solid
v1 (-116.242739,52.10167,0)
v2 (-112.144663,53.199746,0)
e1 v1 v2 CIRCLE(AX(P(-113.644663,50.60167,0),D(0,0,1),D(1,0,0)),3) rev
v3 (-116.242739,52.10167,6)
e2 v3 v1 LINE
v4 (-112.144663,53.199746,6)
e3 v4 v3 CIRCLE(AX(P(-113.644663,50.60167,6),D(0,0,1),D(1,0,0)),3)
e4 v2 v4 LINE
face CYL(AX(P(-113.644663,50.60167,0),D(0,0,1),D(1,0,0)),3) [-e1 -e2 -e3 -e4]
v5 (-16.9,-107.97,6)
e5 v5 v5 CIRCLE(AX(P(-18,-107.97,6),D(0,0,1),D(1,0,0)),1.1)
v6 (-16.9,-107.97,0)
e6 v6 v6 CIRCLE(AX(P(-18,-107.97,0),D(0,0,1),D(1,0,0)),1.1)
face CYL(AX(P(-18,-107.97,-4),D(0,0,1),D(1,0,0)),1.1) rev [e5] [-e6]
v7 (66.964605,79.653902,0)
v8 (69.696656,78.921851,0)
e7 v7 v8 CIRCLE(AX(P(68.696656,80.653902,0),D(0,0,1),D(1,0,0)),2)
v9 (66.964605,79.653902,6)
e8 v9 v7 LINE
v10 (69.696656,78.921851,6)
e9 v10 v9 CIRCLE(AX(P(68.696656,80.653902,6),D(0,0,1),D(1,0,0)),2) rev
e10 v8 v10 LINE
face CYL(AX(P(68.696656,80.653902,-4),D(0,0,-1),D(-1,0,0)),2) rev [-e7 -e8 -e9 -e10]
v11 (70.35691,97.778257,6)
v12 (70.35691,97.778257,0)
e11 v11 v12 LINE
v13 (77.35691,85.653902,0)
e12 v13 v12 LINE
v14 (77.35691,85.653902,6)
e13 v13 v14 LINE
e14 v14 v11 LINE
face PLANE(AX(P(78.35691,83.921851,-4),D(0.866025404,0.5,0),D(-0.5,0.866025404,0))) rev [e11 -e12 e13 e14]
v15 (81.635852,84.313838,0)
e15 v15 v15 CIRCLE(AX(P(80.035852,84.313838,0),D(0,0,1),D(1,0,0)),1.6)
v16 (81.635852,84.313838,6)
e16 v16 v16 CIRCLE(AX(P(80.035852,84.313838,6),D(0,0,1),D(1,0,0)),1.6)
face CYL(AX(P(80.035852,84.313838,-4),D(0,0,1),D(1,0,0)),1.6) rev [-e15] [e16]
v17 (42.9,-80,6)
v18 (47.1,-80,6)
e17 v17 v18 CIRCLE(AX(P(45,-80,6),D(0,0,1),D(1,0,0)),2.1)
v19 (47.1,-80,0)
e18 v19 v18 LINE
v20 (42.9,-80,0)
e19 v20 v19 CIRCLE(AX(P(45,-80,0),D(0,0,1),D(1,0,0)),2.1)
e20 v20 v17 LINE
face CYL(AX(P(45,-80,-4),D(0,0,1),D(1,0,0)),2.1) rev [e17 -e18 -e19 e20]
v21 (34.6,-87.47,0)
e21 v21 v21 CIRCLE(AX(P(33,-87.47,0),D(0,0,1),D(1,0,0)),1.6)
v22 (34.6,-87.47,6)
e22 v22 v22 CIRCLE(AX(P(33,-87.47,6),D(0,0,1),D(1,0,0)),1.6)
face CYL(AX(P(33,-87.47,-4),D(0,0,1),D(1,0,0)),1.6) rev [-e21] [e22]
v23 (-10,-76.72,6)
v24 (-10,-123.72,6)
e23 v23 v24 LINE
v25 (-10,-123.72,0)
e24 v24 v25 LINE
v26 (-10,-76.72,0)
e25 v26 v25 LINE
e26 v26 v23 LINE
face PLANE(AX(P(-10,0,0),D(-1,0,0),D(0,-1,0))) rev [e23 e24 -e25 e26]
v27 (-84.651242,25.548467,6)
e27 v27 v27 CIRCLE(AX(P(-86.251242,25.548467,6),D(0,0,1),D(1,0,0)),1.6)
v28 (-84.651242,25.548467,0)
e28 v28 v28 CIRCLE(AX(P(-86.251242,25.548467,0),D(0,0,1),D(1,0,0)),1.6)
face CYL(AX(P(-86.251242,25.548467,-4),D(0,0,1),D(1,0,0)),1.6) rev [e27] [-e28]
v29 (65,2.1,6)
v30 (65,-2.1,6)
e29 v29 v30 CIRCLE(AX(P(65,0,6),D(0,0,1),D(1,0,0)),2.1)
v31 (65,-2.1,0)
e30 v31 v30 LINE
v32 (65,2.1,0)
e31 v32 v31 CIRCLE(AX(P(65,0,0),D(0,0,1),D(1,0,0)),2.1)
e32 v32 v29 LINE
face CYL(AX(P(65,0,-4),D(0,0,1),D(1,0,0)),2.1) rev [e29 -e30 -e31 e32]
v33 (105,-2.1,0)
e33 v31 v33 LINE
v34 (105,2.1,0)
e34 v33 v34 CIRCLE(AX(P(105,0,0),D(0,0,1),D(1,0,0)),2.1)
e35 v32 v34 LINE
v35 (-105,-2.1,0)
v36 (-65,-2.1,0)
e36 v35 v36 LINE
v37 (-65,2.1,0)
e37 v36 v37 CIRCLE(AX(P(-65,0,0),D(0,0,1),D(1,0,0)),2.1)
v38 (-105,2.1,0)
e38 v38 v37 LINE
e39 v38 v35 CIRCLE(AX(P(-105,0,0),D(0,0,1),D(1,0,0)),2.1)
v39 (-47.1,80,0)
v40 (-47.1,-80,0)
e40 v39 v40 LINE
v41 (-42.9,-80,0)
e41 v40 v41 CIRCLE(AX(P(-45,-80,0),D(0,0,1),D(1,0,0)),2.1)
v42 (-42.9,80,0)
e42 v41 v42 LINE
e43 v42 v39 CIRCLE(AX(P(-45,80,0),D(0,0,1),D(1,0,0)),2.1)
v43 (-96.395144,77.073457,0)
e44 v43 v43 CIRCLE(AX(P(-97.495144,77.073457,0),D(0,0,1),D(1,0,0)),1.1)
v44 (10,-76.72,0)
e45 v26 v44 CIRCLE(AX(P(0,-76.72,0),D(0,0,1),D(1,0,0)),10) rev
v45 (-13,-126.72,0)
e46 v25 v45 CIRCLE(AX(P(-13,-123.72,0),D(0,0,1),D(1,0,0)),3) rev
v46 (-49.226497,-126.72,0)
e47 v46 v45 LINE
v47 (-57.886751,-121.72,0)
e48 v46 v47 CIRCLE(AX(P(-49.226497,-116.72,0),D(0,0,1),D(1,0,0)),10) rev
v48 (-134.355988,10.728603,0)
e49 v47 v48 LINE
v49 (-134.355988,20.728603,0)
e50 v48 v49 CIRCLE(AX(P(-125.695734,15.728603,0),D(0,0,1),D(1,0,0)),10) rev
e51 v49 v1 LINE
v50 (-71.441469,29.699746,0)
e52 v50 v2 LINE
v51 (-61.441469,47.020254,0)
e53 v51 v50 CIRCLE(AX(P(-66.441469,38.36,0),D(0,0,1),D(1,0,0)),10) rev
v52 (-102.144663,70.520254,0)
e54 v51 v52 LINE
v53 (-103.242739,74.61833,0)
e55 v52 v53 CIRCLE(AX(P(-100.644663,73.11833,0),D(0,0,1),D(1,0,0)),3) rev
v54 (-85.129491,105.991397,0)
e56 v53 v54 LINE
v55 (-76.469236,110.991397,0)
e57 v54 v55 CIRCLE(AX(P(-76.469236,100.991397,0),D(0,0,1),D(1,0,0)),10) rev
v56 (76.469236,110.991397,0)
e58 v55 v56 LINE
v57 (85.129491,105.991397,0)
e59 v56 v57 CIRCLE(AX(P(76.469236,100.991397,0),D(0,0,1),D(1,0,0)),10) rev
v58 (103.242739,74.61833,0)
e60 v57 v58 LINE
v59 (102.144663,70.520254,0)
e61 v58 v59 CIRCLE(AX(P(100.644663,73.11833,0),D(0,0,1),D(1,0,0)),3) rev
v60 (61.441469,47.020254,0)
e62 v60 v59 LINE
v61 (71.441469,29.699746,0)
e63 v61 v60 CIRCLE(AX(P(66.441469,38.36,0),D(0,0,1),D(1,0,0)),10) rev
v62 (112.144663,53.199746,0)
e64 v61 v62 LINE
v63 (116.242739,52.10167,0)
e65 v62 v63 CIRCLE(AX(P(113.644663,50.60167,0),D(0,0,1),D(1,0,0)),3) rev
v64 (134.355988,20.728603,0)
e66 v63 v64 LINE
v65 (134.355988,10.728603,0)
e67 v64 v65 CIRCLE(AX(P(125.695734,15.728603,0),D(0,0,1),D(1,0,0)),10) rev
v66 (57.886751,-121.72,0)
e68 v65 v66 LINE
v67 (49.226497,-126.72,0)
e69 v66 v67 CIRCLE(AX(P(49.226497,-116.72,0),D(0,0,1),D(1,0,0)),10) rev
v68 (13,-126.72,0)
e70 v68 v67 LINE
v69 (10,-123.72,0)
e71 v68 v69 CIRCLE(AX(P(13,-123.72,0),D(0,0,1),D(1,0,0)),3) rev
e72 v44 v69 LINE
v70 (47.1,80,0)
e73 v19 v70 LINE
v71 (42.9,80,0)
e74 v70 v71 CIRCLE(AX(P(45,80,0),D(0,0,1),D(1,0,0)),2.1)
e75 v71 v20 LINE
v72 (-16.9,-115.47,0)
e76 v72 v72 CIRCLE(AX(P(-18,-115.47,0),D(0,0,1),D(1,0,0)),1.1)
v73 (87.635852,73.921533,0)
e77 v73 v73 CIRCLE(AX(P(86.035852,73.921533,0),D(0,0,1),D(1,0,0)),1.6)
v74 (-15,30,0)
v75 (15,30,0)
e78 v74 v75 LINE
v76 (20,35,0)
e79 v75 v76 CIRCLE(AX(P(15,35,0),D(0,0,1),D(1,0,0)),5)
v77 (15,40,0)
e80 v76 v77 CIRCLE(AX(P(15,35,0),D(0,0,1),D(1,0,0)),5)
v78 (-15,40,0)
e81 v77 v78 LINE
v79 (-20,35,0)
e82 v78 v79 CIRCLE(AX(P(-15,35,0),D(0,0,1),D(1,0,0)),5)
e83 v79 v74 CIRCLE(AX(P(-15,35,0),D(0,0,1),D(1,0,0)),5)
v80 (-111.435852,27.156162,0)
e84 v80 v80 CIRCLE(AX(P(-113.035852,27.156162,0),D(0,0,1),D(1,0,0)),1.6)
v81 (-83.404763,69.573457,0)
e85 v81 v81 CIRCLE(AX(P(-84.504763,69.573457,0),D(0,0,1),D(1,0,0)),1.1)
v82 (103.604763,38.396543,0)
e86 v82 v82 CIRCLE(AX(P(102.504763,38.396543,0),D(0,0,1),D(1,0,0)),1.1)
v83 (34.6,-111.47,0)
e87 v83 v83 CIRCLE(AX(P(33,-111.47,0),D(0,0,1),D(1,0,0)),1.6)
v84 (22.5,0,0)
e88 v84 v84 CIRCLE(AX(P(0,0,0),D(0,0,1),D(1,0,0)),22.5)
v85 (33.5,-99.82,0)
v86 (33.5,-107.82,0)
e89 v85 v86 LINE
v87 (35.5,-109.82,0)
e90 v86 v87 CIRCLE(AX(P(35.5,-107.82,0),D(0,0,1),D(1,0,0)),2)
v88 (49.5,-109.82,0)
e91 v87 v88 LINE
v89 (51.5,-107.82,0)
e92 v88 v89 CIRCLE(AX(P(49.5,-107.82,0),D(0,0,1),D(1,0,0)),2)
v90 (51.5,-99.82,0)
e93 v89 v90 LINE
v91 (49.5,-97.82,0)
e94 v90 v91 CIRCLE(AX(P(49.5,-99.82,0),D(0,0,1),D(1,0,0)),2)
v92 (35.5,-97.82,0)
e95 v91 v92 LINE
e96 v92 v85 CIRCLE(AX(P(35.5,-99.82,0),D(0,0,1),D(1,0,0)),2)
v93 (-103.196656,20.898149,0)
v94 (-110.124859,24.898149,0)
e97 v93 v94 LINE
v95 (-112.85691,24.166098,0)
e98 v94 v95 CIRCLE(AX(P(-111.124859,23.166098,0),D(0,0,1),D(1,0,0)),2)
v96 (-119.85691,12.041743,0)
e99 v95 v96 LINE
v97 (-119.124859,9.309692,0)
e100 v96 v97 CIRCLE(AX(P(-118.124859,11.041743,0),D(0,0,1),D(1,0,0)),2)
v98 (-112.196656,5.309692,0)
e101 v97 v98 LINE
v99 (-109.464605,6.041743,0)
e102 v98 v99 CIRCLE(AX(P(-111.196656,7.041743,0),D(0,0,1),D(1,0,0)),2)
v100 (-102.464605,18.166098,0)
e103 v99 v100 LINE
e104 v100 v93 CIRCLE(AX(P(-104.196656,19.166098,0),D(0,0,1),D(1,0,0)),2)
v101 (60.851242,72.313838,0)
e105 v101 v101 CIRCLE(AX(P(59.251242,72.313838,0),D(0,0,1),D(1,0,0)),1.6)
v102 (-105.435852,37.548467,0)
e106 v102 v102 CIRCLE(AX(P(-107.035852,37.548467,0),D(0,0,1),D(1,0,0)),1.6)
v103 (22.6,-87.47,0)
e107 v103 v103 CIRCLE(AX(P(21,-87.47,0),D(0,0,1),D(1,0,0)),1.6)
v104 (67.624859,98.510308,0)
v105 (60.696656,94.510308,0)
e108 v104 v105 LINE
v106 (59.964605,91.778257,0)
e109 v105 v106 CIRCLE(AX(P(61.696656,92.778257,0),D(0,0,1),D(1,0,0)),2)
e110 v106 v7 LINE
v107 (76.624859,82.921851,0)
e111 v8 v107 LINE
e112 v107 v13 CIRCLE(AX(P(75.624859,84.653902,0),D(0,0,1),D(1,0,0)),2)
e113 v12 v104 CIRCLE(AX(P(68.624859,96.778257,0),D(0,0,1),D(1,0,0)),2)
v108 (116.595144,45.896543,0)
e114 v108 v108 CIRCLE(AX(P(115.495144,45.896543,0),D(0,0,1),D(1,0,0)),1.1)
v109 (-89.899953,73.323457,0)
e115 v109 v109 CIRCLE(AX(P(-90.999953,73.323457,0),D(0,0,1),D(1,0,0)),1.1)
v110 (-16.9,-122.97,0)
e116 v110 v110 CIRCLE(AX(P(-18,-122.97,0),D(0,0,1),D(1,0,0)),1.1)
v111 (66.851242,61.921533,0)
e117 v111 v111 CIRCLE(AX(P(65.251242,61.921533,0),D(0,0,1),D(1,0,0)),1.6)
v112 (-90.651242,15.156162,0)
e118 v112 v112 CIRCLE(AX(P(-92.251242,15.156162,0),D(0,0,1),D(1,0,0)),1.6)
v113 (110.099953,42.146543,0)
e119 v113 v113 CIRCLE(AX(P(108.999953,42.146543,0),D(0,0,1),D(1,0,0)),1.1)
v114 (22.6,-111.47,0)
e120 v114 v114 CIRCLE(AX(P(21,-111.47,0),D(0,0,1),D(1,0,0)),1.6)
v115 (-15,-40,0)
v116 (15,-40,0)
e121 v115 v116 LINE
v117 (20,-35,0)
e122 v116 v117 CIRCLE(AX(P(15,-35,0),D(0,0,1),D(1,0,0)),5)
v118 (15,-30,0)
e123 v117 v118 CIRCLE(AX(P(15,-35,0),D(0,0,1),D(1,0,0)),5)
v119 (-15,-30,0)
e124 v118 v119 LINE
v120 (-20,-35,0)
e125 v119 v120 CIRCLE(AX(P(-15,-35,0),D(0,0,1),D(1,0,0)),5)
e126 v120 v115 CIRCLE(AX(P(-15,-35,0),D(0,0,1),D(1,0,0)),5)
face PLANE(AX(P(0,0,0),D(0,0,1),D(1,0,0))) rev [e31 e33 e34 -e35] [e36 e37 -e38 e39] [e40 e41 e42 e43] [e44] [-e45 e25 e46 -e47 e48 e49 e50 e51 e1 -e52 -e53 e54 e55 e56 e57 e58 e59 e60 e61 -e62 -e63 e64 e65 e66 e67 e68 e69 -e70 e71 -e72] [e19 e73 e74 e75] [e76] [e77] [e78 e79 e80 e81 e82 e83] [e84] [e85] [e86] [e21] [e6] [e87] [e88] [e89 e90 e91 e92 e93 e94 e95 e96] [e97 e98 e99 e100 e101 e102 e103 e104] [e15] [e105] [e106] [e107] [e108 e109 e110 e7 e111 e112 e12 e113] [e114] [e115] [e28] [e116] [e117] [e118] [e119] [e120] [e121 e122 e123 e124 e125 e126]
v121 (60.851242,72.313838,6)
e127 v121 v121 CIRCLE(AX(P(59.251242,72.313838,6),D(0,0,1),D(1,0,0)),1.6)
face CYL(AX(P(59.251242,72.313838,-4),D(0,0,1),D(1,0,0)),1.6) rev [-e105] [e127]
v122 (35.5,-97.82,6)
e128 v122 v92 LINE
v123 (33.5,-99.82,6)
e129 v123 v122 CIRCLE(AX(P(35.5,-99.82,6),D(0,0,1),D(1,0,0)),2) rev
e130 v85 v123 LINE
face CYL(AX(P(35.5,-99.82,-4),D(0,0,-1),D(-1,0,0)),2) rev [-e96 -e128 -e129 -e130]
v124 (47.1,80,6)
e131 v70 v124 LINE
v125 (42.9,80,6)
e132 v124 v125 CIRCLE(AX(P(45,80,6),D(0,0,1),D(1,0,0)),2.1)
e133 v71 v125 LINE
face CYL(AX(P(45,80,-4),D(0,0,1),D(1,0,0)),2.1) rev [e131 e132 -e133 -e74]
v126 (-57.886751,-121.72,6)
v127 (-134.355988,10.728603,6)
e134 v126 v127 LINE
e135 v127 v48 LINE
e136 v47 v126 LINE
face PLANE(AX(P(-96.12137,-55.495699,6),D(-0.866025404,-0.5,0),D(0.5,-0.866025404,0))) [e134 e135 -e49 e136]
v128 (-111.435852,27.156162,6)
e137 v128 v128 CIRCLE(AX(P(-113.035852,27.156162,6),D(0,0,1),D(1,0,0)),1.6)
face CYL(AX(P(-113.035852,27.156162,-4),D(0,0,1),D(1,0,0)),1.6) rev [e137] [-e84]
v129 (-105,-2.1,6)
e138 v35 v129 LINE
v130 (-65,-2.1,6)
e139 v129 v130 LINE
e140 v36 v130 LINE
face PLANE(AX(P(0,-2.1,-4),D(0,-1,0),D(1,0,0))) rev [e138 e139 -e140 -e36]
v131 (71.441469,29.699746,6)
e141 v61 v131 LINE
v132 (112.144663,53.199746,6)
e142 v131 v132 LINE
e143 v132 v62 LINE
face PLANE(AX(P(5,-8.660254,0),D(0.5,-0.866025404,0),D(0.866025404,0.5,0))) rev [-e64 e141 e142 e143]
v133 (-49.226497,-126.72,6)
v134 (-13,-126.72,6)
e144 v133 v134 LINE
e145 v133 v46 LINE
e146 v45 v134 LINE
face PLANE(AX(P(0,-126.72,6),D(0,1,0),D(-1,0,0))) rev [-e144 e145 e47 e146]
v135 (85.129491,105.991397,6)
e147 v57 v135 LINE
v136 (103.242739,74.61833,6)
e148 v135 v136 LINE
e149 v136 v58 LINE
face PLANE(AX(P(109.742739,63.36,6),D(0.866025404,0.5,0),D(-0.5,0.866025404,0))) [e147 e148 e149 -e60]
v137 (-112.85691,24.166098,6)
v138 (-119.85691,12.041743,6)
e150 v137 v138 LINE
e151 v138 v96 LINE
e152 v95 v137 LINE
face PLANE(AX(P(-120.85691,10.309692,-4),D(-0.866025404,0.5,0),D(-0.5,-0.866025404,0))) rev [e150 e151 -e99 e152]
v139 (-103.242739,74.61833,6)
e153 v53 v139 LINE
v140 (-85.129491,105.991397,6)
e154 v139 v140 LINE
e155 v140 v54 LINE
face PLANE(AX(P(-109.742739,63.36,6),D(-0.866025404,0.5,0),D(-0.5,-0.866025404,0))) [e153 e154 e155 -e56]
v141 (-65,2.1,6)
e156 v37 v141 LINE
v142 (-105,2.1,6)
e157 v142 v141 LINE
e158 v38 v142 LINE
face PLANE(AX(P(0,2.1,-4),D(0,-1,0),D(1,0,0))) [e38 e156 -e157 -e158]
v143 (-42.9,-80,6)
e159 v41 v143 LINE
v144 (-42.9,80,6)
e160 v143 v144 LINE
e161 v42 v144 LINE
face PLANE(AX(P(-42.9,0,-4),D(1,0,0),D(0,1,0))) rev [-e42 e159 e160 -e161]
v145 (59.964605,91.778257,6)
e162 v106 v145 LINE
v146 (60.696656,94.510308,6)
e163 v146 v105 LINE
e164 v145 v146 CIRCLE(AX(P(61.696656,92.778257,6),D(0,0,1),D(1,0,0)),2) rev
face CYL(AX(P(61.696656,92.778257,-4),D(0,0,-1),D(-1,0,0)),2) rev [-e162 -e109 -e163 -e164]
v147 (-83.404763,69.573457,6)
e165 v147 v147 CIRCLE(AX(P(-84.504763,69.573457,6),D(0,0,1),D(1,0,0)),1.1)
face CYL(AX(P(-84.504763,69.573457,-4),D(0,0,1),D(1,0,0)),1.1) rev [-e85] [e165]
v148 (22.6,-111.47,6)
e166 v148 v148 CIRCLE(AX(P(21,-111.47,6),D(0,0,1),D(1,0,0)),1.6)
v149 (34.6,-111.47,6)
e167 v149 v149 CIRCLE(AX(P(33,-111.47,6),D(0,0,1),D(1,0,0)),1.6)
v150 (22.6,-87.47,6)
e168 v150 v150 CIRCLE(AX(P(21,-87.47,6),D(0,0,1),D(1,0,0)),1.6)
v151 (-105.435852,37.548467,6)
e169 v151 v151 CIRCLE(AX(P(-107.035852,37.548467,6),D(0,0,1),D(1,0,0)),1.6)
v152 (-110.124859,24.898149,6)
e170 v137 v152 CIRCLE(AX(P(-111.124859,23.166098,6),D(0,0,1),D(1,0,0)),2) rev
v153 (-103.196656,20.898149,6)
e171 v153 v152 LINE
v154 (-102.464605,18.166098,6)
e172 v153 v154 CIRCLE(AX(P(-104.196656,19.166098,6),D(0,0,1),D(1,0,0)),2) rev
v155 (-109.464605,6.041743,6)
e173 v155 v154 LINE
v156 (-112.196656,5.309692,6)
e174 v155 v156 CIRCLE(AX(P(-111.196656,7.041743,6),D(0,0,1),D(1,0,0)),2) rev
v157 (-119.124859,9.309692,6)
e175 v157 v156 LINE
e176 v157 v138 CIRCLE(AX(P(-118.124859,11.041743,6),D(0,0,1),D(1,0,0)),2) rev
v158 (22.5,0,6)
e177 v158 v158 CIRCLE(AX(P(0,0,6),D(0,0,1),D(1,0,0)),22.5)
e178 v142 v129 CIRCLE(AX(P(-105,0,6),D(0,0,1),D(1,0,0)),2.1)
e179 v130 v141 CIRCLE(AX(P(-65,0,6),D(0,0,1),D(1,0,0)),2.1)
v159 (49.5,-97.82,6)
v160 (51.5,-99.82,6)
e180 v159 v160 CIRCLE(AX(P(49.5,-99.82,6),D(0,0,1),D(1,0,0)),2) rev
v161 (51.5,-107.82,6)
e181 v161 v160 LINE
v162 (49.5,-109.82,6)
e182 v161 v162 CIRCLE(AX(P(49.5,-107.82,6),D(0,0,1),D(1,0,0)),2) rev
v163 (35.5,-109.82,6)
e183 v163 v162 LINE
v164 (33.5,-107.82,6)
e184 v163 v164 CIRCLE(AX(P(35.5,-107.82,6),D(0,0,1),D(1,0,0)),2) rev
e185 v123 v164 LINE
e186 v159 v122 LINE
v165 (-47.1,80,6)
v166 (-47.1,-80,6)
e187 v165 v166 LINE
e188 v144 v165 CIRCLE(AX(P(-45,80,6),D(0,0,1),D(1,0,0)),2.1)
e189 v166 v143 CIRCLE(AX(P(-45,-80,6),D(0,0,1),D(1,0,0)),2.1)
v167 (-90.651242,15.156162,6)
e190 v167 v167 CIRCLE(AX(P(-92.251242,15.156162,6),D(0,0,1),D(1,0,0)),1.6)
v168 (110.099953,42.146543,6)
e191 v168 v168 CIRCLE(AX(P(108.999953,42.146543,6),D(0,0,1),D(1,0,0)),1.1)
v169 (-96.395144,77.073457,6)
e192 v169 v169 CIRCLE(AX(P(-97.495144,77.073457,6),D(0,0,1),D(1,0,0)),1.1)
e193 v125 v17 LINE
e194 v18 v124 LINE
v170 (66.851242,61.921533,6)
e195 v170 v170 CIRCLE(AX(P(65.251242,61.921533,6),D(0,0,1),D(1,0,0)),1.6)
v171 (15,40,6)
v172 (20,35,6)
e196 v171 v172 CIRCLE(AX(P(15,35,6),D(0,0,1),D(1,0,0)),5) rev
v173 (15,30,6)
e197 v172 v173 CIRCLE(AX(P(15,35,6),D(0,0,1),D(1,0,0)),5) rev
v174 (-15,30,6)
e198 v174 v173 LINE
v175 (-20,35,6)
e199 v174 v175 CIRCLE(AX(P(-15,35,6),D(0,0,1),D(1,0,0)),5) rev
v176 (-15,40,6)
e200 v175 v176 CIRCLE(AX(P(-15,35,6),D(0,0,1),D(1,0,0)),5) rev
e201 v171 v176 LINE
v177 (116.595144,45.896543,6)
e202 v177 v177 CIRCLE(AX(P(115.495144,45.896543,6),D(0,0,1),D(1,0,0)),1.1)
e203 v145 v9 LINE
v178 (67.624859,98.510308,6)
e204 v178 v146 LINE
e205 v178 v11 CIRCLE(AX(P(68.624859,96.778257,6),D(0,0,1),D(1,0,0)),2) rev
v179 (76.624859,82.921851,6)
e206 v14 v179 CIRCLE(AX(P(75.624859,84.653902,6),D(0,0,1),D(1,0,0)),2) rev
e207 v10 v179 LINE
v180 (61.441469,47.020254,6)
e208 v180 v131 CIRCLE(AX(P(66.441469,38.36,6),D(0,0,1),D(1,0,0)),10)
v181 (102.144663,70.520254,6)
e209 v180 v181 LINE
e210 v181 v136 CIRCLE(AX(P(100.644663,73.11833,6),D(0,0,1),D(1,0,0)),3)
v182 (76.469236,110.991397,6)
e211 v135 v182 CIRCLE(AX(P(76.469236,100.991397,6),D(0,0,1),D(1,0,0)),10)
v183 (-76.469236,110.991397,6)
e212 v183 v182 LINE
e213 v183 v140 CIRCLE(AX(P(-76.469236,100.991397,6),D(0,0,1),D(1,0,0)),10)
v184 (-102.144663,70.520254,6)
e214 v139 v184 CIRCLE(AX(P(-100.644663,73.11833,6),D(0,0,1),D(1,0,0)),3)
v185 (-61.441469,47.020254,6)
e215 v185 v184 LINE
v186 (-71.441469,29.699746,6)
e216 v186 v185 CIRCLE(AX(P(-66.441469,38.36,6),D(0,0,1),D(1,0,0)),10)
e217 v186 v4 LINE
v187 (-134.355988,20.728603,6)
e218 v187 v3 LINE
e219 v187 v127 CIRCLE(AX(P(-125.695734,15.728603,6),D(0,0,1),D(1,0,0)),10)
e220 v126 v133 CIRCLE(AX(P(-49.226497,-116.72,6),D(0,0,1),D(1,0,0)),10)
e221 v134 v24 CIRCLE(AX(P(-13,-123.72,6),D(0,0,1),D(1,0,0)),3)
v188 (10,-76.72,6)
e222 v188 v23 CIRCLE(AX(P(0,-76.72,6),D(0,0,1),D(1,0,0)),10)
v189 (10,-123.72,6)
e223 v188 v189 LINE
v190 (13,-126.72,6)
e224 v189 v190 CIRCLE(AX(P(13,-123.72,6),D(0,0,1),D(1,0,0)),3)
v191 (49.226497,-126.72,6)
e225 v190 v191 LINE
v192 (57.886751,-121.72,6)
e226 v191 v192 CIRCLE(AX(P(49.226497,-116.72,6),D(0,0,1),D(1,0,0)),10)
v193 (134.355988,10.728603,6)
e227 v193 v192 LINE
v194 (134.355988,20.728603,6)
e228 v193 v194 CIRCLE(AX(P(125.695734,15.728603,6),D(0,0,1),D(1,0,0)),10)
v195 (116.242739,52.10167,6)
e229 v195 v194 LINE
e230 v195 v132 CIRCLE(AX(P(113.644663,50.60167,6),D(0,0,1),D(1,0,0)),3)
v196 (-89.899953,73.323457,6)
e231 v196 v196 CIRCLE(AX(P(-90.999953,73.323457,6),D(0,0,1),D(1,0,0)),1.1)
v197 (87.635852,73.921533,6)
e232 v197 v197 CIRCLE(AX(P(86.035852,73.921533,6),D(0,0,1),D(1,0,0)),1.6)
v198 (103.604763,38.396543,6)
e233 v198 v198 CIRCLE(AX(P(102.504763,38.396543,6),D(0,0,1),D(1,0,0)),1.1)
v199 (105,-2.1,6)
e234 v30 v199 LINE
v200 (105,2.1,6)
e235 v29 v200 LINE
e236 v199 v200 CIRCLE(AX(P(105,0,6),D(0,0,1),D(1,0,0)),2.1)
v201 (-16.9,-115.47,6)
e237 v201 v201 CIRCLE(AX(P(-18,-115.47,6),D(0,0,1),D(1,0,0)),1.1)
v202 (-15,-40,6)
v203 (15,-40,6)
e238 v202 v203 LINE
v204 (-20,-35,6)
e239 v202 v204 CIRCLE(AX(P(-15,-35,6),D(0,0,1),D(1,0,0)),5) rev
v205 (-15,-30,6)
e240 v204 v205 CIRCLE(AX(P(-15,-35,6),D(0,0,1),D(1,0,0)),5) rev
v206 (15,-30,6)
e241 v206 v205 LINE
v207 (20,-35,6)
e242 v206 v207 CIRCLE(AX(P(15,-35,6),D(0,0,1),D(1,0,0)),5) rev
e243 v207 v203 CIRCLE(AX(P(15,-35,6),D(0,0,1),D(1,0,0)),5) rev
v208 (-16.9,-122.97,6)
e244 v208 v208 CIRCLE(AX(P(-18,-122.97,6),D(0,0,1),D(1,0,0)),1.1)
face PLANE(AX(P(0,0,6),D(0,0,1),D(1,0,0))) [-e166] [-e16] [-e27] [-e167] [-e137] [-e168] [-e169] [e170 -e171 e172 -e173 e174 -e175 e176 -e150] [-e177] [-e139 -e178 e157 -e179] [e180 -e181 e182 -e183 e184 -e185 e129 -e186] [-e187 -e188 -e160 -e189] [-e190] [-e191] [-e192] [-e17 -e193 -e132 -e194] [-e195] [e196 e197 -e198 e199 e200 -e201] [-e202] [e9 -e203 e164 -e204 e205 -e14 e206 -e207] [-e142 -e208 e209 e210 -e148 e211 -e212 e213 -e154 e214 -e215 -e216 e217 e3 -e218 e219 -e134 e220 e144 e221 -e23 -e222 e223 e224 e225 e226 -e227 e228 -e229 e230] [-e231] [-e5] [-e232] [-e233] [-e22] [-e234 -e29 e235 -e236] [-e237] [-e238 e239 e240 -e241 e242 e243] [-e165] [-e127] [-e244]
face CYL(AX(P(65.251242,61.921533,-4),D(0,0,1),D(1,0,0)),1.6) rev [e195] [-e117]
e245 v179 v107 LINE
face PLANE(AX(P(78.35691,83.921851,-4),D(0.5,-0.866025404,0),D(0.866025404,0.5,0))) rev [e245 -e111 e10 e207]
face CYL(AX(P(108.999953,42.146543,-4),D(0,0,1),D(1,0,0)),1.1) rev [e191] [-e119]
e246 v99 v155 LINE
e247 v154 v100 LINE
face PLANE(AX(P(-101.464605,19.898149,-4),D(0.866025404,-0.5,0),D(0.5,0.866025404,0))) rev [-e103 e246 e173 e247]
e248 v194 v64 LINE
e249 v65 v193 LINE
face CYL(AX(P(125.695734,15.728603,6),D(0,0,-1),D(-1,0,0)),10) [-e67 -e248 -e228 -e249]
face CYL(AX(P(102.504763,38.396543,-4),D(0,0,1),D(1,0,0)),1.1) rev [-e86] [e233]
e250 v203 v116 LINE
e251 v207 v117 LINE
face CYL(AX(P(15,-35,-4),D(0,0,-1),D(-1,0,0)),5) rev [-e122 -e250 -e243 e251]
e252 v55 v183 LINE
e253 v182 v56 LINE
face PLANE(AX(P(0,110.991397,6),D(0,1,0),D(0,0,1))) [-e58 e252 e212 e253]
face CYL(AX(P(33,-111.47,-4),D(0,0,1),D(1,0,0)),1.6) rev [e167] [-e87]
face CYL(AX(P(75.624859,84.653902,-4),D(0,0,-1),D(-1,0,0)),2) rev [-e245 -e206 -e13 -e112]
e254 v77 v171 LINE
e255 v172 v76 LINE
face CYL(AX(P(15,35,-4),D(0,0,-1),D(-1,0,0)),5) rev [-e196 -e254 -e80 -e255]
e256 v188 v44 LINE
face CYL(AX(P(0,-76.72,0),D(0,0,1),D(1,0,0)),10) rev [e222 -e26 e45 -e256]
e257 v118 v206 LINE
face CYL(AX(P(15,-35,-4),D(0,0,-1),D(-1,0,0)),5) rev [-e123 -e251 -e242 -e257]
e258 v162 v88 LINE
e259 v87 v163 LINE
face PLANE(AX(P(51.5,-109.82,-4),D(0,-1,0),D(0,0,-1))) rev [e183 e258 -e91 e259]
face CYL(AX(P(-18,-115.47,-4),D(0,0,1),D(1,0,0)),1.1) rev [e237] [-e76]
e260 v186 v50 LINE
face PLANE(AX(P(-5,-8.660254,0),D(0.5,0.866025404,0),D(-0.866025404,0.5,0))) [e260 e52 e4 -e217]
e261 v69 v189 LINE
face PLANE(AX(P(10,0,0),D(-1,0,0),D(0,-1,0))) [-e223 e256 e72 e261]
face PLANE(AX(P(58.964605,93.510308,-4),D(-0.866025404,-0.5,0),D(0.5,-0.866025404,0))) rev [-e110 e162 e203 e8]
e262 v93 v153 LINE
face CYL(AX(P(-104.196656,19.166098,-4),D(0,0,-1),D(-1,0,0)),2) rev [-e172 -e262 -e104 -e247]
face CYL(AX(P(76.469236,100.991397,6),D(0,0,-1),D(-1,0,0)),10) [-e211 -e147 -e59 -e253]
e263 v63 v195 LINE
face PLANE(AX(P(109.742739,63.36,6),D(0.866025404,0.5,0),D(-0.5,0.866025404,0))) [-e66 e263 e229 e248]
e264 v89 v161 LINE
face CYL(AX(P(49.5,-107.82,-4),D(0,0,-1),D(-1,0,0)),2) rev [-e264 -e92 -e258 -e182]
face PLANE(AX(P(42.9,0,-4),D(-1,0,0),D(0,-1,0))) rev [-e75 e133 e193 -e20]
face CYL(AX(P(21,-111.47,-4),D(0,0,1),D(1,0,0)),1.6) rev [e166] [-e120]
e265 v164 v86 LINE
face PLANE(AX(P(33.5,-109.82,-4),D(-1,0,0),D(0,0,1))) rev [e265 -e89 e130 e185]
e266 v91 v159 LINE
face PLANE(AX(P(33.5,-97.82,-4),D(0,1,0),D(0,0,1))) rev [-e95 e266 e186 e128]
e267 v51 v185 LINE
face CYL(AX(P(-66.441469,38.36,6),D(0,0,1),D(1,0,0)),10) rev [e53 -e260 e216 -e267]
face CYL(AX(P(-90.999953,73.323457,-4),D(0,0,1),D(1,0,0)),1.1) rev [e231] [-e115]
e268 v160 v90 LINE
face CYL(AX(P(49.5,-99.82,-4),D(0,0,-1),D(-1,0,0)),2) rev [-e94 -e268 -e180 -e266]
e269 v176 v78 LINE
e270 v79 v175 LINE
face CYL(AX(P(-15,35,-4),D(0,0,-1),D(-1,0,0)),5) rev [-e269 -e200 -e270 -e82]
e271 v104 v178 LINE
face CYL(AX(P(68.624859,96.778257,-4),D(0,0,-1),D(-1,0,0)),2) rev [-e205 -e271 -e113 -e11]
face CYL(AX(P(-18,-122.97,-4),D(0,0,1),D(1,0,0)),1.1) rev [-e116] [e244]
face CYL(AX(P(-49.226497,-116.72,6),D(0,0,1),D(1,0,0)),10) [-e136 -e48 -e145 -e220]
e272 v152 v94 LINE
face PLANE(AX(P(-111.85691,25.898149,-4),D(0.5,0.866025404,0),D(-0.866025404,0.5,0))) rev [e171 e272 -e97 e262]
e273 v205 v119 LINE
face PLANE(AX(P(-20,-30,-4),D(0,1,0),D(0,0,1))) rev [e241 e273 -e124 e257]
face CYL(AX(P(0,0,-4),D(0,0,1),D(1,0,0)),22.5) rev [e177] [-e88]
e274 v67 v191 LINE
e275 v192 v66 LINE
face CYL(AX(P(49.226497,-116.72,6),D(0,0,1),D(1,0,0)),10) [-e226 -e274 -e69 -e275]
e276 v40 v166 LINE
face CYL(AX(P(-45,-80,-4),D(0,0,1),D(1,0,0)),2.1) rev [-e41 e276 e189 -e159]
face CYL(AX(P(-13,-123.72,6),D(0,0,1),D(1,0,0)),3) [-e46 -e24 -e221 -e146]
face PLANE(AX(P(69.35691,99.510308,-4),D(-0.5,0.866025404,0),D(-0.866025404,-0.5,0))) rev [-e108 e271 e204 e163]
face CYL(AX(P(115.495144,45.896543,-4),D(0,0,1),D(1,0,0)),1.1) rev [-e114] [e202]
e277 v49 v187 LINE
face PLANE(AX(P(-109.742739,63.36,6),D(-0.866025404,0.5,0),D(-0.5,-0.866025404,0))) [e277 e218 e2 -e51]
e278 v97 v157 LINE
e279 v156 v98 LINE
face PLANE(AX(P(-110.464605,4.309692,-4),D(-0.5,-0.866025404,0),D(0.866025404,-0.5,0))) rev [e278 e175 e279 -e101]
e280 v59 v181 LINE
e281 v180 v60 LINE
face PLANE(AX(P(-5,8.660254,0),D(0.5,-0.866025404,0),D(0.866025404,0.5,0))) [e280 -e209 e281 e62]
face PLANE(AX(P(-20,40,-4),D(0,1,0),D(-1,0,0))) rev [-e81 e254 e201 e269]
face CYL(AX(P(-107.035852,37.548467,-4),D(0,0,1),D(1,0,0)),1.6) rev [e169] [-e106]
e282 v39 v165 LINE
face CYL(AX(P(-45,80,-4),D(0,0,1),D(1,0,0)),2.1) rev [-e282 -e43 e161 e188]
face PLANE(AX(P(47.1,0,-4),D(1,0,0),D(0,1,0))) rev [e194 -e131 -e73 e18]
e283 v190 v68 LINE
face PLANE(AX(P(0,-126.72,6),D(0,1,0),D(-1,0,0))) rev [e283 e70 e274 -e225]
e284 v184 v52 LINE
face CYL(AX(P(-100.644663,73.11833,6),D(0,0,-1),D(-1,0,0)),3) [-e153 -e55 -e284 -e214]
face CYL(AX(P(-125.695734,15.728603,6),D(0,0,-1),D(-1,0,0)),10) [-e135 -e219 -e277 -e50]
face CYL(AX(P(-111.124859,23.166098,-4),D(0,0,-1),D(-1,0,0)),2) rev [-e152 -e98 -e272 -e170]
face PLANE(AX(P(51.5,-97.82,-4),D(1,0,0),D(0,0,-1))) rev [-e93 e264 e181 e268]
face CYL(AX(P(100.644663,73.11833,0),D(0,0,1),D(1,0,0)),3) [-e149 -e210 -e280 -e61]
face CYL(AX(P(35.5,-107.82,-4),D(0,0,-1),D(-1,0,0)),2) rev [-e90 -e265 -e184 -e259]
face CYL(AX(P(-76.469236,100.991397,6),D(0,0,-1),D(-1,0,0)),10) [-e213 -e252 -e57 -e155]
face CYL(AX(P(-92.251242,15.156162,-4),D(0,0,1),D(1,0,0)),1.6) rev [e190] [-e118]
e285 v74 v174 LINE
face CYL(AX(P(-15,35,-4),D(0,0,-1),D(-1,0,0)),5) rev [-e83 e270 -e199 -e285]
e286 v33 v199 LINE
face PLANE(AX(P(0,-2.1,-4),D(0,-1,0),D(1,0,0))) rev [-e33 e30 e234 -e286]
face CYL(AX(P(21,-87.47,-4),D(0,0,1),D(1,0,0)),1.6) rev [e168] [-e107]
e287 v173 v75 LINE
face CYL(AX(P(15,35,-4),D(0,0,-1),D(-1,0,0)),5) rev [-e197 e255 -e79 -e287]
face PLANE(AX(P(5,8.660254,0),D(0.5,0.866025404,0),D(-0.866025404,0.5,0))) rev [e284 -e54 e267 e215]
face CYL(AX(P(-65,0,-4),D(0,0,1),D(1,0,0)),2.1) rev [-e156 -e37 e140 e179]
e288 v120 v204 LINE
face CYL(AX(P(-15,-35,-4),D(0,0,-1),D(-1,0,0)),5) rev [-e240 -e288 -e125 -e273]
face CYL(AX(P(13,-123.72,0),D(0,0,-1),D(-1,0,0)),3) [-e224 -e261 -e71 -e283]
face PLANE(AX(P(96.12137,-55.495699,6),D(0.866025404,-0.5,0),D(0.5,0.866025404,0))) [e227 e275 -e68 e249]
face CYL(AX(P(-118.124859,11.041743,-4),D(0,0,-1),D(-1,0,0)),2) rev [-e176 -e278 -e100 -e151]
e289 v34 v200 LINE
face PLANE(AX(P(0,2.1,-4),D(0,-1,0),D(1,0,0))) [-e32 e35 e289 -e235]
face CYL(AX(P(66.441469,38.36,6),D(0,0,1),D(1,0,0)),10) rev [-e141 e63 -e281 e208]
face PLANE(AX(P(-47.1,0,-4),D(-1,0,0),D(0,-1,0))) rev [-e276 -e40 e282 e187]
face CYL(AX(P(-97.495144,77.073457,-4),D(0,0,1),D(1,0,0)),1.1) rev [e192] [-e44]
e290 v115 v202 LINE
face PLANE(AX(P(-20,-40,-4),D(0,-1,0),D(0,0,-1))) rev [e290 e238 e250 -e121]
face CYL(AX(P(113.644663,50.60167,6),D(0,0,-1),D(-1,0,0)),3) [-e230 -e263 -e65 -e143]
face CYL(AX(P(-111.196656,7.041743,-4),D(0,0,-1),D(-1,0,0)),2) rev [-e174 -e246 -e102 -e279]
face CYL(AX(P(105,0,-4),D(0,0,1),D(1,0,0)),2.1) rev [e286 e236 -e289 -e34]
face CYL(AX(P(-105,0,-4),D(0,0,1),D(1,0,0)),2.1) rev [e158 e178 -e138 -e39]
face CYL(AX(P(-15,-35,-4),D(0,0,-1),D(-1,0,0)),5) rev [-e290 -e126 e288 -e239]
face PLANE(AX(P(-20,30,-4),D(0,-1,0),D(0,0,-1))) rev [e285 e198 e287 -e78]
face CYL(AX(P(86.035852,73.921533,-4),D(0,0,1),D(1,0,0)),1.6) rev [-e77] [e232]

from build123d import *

# Parameters (mm, degrees)
BOSS_EXTRUDE1_DEPTH = 6
CUT_EXTRUDE2_DEPTH  = 6
SKETCH4_R           = 1.6
SKETCH4_W           = 18
SKETCH4_H           = 12
CUT_EXTRUDE3_DEPTH  = 10
FILLET1_R           = 2
FILLET2_R           = 2
SKETCH5_R           = 1.1
CUT_EXTRUDE4_DEPTH  = 10
SKETCH6_R           = 22.5
CUT_EXTRUDE5_DEPTH  = 10
FILLET4_R           = 10
FILLET5_R           = 10
FILLET6_R           = 10
FILLET7_R           = 10
FILLET8_R           = 3
SKETCH8_W           = 40
SKETCH8_H           = 10
CUT_EXTRUDE11_DEPTH = 10
FILLET9_R           = 5
CUT_EXTRUDE13_DEPTH = 10
FILLET10_R          = 2


with BuildPart() as part:
    # Sketch1 → Boss-Extrude1 (new body)
    with BuildSketch(Plane.XY):
        Polygon((0, -126.72), (0, 0), (-109.742739168, 63.36), (-137.242739168, 15.728602792), (-55, -126.72), align=None)
        Polygon((-109.742739168, 63.36), (0, 0), (100, 57.735026919), (109.742739168, 63.36), (82.242739168, 110.991397208), (-82.242739168, 110.991397208), align=None)
        Polygon((100, 57.735026919), (0, 0), (0, -126.72), (55, -126.72), (137.242739168, 15.728602792), (109.742739168, 63.36), align=None)
    extrude(amount=BOSS_EXTRUDE1_DEPTH)

    # Sketch3 → Cut-Extrude2 (cut)
    with BuildSketch(Plane.XY.offset(6)):
        Polygon((-109.742739168, 63.36), (-114.742739168, 54.699745962), (-62.78121494, 24.699745962), (-57.78121494, 33.36), align=None)
        Polygon((-104.742739168, 72.020254038), (-109.742739168, 63.36), (-57.78121494, 33.36), (-52.78121494, 42.020254038), align=None)
        Polygon((104.742739168, 72.020254038), (52.78121494, 42.020254038), (57.78121494, 33.36), (62.78121494, 24.699745962), (114.742739168, 54.699745962), align=None)
        Polygon((10, -126.72), (10, -66.72), (0, -66.72), (-10, -66.72), (-10, -126.72), align=None)
    extrude(amount=-CUT_EXTRUDE2_DEPTH, mode=Mode.SUBTRACT)

    # Sketch4 → Cut-Extrude3 (cut)
    with BuildSketch(Plane.XY.offset(6)):
        with Locations((21, -87.47)):
            Circle(SKETCH4_R)
        with Locations((33, -87.47)):
            Circle(SKETCH4_R)
        with Locations((21, -111.47)):
            Circle(SKETCH4_R)
        with Locations((33, -111.47)):
            Circle(SKETCH4_R)
        with Locations((-86.251242069, 25.548466521)):
            Circle(SKETCH4_R)
        with Locations((-92.251242069, 15.156161675)):
            Circle(SKETCH4_R)
        with Locations((-113.03585176, 27.156161675)):
            Circle(SKETCH4_R)
        with Locations((-107.03585176, 37.548466521)):
            Circle(SKETCH4_R)
        with Locations((65.251242069, 61.921533479)):
            Circle(SKETCH4_R)
        with Locations((59.251242069, 72.313838325)):
            Circle(SKETCH4_R)
        with Locations((80.03585176, 84.313838325)):
            Circle(SKETCH4_R)
        with Locations((86.03585176, 73.921533479)):
            Circle(SKETCH4_R)
        Polygon((-111.856909844, 25.898148973), (-101.464604998, 19.898148973), (-110.464604998, 4.309691705), (-120.856909844, 10.309691705), align=None)
        Polygon((69.356909844, 99.510308295), (58.964604998, 93.510308295), (67.964604998, 77.921851027), (78.356909844, 83.921851027), align=None)
        with Locations((42.5, -103.82)):
            Rectangle(SKETCH4_W, SKETCH4_H)
    extrude(amount=-CUT_EXTRUDE3_DEPTH, mode=Mode.SUBTRACT)

    # Fillet1
    fillet1_edges = [part.edges().sort_by_distance(p)[0] for p in [
        (33.5, -109.82, 3),
        (33.5, -97.82, 3),
        (51.5, -97.82, 3),
        (51.5, -109.82, 3),
    ]]
    fillet(fillet1_edges, radius=FILLET1_R)

    # Fillet2
    fillet2_edges = [part.edges().sort_by_distance(p)[0] for p in [
        (-120.856909844, 10.309691705, 3),
        (-111.856909844, 25.898148973, 3),
        (-101.464604998, 19.898148973, 3),
        (-110.464604998, 4.309691705, 3),
    ]]
    fillet(fillet2_edges, radius=FILLET2_R)

    # Sketch5 → Cut-Extrude4 (cut)
    with BuildSketch(Plane.XY.offset(6)):
        with Locations((115.495143903, 45.896542732)):
            Circle(SKETCH5_R)
        with Locations((108.999953375, 42.146542732)):
            Circle(SKETCH5_R)
        with Locations((102.504762847, 38.396542732)):
            Circle(SKETCH5_R)
        with Locations((-18, -122.97)):
            Circle(SKETCH5_R)
        with Locations((-18, -115.47)):
            Circle(SKETCH5_R)
        with Locations((-18, -107.97)):
            Circle(SKETCH5_R)
        with Locations((-97.495143903, 77.073457268)):
            Circle(SKETCH5_R)
        with Locations((-90.999953375, 73.323457268)):
            Circle(SKETCH5_R)
        with Locations((-84.504762847, 69.573457268)):
            Circle(SKETCH5_R)
    extrude(amount=-CUT_EXTRUDE4_DEPTH, mode=Mode.SUBTRACT)

    # Sketch6 → Cut-Extrude5 (cut)
    with BuildSketch(Plane.XY.offset(6)):
        Circle(SKETCH6_R)
    extrude(amount=-CUT_EXTRUDE5_DEPTH, mode=Mode.SUBTRACT)

    # Fillet4
    fillet4_edges = [part.edges().sort_by_distance(p)[0] for p in [
        (-10, -66.72, 3),
        (10, -66.72, 3),
    ]]
    fillet(fillet4_edges, radius=FILLET4_R - 0.0001)  # a hair under: the kernel refuses the full size

    # Fillet5
    fillet5_edges = [part.edges().sort_by_distance(p)[0] for p in [
        (62.78121494, 24.699745962, 3),
        (52.78121494, 42.020254038, 3),
    ]]
    fillet(fillet5_edges, radius=FILLET5_R - 0.0001)  # a hair under: the kernel refuses the full size

    # Fillet6
    fillet6_edges = [part.edges().sort_by_distance(p)[0] for p in [
        (-52.78121494, 42.020254038, 3),
        (-62.78121494, 24.699745962, 3),
    ]]
    fillet(fillet6_edges, radius=FILLET6_R - 0.0001)  # a hair under: the kernel refuses the full size

    # Fillet7
    fillet7_edges = [part.edges().sort_by_distance(p)[0] for p in [
        (55, -126.72, 3),
        (-55, -126.72, 3),
        (-137.242739168, 15.728602792, 3),
        (-82.242739168, 110.991397208, 3),
        (82.242739168, 110.991397208, 3),
        (137.242739168, 15.728602792, 3),
    ]]
    fillet(fillet7_edges, radius=FILLET7_R)

    # Fillet8
    fillet8_edges = [part.edges().sort_by_distance(p)[0] for p in [
        (-114.742739168, 54.699745962, 3),
        (-104.742739168, 72.020254038, 3),
        (104.742739168, 72.020254038, 3),
        (114.742739168, 54.699745962, 3),
        (10, -126.72, 3),
        (-10, -126.72, 3),
    ]]
    fillet(fillet8_edges, radius=FILLET8_R)

    # Sketch8 → Cut-Extrude11 (cut)
    with BuildSketch(Plane.XY.offset(6)):
        with Locations((0, 35)):
            Rectangle(SKETCH8_W, SKETCH8_H)
        with Locations((0, -35)):
            Rectangle(SKETCH8_W, SKETCH8_H)
    extrude(amount=-CUT_EXTRUDE11_DEPTH, mode=Mode.SUBTRACT)

    # Fillet9
    fillet9_edges = [part.edges().sort_by_distance(p)[0] for p in [
        (20, -40, 3),
        (20, -30, 3),
        (-20, -40, 3),
        (-20, -30, 3),
        (20, 30, 3),
        (20, 40, 3),
        (-20, 30, 3),
        (-20, 40, 3),
    ]]
    fillet(fillet9_edges, radius=FILLET9_R - 0.0001)  # a hair under: the kernel refuses the full size

    # Sketch7 → Cut-Extrude13 (cut)
    with BuildSketch(Plane.XY.offset(6)):
        with BuildLine():
            Line((-47.1, 80), (-47.1, -80))
            ThreePointArc((-47.1, -80), (-45, -82.1), (-42.9, -80))
            Line((-42.9, -80), (-42.9, 80))
            ThreePointArc((-42.9, 80), (-45, 82.1), (-47.1, 80))
        make_face()
        with BuildLine():
            Line((42.9, 80), (42.9, -80))
            ThreePointArc((42.9, -80), (45, -82.1), (47.1, -80))
            Line((47.1, -80), (47.1, 80))
            ThreePointArc((47.1, 80), (45, 82.1), (42.9, 80))
        make_face()
        with BuildLine():
            Line((-105, 2.1), (-65, 2.1))
            ThreePointArc((-65, 2.1), (-62.9, 0), (-65, -2.1))
            Line((-65, -2.1), (-105, -2.1))
            ThreePointArc((-105, -2.1), (-107.1, 0), (-105, 2.1))
        make_face()
        with BuildLine():
            Line((65, 2.1), (105, 2.1))
            ThreePointArc((105, 2.1), (107.1, 0), (105, -2.1))
            Line((105, -2.1), (65, -2.1))
            ThreePointArc((65, -2.1), (62.9, 0), (65, 2.1))
        make_face()
    extrude(amount=-CUT_EXTRUDE13_DEPTH, mode=Mode.SUBTRACT)

    # Fillet10
    fillet10_edges = [part.edges().sort_by_distance(p)[0] for p in [
        (69.356909844, 99.510308295, 3),
        (78.356909844, 83.921851027, 3),
        (67.964604998, 77.921851027, 3),
        (58.964604998, 93.510308295, 3),
    ]]
    fillet(fillet10_edges, radius=FILLET10_R)


solid = part.part
